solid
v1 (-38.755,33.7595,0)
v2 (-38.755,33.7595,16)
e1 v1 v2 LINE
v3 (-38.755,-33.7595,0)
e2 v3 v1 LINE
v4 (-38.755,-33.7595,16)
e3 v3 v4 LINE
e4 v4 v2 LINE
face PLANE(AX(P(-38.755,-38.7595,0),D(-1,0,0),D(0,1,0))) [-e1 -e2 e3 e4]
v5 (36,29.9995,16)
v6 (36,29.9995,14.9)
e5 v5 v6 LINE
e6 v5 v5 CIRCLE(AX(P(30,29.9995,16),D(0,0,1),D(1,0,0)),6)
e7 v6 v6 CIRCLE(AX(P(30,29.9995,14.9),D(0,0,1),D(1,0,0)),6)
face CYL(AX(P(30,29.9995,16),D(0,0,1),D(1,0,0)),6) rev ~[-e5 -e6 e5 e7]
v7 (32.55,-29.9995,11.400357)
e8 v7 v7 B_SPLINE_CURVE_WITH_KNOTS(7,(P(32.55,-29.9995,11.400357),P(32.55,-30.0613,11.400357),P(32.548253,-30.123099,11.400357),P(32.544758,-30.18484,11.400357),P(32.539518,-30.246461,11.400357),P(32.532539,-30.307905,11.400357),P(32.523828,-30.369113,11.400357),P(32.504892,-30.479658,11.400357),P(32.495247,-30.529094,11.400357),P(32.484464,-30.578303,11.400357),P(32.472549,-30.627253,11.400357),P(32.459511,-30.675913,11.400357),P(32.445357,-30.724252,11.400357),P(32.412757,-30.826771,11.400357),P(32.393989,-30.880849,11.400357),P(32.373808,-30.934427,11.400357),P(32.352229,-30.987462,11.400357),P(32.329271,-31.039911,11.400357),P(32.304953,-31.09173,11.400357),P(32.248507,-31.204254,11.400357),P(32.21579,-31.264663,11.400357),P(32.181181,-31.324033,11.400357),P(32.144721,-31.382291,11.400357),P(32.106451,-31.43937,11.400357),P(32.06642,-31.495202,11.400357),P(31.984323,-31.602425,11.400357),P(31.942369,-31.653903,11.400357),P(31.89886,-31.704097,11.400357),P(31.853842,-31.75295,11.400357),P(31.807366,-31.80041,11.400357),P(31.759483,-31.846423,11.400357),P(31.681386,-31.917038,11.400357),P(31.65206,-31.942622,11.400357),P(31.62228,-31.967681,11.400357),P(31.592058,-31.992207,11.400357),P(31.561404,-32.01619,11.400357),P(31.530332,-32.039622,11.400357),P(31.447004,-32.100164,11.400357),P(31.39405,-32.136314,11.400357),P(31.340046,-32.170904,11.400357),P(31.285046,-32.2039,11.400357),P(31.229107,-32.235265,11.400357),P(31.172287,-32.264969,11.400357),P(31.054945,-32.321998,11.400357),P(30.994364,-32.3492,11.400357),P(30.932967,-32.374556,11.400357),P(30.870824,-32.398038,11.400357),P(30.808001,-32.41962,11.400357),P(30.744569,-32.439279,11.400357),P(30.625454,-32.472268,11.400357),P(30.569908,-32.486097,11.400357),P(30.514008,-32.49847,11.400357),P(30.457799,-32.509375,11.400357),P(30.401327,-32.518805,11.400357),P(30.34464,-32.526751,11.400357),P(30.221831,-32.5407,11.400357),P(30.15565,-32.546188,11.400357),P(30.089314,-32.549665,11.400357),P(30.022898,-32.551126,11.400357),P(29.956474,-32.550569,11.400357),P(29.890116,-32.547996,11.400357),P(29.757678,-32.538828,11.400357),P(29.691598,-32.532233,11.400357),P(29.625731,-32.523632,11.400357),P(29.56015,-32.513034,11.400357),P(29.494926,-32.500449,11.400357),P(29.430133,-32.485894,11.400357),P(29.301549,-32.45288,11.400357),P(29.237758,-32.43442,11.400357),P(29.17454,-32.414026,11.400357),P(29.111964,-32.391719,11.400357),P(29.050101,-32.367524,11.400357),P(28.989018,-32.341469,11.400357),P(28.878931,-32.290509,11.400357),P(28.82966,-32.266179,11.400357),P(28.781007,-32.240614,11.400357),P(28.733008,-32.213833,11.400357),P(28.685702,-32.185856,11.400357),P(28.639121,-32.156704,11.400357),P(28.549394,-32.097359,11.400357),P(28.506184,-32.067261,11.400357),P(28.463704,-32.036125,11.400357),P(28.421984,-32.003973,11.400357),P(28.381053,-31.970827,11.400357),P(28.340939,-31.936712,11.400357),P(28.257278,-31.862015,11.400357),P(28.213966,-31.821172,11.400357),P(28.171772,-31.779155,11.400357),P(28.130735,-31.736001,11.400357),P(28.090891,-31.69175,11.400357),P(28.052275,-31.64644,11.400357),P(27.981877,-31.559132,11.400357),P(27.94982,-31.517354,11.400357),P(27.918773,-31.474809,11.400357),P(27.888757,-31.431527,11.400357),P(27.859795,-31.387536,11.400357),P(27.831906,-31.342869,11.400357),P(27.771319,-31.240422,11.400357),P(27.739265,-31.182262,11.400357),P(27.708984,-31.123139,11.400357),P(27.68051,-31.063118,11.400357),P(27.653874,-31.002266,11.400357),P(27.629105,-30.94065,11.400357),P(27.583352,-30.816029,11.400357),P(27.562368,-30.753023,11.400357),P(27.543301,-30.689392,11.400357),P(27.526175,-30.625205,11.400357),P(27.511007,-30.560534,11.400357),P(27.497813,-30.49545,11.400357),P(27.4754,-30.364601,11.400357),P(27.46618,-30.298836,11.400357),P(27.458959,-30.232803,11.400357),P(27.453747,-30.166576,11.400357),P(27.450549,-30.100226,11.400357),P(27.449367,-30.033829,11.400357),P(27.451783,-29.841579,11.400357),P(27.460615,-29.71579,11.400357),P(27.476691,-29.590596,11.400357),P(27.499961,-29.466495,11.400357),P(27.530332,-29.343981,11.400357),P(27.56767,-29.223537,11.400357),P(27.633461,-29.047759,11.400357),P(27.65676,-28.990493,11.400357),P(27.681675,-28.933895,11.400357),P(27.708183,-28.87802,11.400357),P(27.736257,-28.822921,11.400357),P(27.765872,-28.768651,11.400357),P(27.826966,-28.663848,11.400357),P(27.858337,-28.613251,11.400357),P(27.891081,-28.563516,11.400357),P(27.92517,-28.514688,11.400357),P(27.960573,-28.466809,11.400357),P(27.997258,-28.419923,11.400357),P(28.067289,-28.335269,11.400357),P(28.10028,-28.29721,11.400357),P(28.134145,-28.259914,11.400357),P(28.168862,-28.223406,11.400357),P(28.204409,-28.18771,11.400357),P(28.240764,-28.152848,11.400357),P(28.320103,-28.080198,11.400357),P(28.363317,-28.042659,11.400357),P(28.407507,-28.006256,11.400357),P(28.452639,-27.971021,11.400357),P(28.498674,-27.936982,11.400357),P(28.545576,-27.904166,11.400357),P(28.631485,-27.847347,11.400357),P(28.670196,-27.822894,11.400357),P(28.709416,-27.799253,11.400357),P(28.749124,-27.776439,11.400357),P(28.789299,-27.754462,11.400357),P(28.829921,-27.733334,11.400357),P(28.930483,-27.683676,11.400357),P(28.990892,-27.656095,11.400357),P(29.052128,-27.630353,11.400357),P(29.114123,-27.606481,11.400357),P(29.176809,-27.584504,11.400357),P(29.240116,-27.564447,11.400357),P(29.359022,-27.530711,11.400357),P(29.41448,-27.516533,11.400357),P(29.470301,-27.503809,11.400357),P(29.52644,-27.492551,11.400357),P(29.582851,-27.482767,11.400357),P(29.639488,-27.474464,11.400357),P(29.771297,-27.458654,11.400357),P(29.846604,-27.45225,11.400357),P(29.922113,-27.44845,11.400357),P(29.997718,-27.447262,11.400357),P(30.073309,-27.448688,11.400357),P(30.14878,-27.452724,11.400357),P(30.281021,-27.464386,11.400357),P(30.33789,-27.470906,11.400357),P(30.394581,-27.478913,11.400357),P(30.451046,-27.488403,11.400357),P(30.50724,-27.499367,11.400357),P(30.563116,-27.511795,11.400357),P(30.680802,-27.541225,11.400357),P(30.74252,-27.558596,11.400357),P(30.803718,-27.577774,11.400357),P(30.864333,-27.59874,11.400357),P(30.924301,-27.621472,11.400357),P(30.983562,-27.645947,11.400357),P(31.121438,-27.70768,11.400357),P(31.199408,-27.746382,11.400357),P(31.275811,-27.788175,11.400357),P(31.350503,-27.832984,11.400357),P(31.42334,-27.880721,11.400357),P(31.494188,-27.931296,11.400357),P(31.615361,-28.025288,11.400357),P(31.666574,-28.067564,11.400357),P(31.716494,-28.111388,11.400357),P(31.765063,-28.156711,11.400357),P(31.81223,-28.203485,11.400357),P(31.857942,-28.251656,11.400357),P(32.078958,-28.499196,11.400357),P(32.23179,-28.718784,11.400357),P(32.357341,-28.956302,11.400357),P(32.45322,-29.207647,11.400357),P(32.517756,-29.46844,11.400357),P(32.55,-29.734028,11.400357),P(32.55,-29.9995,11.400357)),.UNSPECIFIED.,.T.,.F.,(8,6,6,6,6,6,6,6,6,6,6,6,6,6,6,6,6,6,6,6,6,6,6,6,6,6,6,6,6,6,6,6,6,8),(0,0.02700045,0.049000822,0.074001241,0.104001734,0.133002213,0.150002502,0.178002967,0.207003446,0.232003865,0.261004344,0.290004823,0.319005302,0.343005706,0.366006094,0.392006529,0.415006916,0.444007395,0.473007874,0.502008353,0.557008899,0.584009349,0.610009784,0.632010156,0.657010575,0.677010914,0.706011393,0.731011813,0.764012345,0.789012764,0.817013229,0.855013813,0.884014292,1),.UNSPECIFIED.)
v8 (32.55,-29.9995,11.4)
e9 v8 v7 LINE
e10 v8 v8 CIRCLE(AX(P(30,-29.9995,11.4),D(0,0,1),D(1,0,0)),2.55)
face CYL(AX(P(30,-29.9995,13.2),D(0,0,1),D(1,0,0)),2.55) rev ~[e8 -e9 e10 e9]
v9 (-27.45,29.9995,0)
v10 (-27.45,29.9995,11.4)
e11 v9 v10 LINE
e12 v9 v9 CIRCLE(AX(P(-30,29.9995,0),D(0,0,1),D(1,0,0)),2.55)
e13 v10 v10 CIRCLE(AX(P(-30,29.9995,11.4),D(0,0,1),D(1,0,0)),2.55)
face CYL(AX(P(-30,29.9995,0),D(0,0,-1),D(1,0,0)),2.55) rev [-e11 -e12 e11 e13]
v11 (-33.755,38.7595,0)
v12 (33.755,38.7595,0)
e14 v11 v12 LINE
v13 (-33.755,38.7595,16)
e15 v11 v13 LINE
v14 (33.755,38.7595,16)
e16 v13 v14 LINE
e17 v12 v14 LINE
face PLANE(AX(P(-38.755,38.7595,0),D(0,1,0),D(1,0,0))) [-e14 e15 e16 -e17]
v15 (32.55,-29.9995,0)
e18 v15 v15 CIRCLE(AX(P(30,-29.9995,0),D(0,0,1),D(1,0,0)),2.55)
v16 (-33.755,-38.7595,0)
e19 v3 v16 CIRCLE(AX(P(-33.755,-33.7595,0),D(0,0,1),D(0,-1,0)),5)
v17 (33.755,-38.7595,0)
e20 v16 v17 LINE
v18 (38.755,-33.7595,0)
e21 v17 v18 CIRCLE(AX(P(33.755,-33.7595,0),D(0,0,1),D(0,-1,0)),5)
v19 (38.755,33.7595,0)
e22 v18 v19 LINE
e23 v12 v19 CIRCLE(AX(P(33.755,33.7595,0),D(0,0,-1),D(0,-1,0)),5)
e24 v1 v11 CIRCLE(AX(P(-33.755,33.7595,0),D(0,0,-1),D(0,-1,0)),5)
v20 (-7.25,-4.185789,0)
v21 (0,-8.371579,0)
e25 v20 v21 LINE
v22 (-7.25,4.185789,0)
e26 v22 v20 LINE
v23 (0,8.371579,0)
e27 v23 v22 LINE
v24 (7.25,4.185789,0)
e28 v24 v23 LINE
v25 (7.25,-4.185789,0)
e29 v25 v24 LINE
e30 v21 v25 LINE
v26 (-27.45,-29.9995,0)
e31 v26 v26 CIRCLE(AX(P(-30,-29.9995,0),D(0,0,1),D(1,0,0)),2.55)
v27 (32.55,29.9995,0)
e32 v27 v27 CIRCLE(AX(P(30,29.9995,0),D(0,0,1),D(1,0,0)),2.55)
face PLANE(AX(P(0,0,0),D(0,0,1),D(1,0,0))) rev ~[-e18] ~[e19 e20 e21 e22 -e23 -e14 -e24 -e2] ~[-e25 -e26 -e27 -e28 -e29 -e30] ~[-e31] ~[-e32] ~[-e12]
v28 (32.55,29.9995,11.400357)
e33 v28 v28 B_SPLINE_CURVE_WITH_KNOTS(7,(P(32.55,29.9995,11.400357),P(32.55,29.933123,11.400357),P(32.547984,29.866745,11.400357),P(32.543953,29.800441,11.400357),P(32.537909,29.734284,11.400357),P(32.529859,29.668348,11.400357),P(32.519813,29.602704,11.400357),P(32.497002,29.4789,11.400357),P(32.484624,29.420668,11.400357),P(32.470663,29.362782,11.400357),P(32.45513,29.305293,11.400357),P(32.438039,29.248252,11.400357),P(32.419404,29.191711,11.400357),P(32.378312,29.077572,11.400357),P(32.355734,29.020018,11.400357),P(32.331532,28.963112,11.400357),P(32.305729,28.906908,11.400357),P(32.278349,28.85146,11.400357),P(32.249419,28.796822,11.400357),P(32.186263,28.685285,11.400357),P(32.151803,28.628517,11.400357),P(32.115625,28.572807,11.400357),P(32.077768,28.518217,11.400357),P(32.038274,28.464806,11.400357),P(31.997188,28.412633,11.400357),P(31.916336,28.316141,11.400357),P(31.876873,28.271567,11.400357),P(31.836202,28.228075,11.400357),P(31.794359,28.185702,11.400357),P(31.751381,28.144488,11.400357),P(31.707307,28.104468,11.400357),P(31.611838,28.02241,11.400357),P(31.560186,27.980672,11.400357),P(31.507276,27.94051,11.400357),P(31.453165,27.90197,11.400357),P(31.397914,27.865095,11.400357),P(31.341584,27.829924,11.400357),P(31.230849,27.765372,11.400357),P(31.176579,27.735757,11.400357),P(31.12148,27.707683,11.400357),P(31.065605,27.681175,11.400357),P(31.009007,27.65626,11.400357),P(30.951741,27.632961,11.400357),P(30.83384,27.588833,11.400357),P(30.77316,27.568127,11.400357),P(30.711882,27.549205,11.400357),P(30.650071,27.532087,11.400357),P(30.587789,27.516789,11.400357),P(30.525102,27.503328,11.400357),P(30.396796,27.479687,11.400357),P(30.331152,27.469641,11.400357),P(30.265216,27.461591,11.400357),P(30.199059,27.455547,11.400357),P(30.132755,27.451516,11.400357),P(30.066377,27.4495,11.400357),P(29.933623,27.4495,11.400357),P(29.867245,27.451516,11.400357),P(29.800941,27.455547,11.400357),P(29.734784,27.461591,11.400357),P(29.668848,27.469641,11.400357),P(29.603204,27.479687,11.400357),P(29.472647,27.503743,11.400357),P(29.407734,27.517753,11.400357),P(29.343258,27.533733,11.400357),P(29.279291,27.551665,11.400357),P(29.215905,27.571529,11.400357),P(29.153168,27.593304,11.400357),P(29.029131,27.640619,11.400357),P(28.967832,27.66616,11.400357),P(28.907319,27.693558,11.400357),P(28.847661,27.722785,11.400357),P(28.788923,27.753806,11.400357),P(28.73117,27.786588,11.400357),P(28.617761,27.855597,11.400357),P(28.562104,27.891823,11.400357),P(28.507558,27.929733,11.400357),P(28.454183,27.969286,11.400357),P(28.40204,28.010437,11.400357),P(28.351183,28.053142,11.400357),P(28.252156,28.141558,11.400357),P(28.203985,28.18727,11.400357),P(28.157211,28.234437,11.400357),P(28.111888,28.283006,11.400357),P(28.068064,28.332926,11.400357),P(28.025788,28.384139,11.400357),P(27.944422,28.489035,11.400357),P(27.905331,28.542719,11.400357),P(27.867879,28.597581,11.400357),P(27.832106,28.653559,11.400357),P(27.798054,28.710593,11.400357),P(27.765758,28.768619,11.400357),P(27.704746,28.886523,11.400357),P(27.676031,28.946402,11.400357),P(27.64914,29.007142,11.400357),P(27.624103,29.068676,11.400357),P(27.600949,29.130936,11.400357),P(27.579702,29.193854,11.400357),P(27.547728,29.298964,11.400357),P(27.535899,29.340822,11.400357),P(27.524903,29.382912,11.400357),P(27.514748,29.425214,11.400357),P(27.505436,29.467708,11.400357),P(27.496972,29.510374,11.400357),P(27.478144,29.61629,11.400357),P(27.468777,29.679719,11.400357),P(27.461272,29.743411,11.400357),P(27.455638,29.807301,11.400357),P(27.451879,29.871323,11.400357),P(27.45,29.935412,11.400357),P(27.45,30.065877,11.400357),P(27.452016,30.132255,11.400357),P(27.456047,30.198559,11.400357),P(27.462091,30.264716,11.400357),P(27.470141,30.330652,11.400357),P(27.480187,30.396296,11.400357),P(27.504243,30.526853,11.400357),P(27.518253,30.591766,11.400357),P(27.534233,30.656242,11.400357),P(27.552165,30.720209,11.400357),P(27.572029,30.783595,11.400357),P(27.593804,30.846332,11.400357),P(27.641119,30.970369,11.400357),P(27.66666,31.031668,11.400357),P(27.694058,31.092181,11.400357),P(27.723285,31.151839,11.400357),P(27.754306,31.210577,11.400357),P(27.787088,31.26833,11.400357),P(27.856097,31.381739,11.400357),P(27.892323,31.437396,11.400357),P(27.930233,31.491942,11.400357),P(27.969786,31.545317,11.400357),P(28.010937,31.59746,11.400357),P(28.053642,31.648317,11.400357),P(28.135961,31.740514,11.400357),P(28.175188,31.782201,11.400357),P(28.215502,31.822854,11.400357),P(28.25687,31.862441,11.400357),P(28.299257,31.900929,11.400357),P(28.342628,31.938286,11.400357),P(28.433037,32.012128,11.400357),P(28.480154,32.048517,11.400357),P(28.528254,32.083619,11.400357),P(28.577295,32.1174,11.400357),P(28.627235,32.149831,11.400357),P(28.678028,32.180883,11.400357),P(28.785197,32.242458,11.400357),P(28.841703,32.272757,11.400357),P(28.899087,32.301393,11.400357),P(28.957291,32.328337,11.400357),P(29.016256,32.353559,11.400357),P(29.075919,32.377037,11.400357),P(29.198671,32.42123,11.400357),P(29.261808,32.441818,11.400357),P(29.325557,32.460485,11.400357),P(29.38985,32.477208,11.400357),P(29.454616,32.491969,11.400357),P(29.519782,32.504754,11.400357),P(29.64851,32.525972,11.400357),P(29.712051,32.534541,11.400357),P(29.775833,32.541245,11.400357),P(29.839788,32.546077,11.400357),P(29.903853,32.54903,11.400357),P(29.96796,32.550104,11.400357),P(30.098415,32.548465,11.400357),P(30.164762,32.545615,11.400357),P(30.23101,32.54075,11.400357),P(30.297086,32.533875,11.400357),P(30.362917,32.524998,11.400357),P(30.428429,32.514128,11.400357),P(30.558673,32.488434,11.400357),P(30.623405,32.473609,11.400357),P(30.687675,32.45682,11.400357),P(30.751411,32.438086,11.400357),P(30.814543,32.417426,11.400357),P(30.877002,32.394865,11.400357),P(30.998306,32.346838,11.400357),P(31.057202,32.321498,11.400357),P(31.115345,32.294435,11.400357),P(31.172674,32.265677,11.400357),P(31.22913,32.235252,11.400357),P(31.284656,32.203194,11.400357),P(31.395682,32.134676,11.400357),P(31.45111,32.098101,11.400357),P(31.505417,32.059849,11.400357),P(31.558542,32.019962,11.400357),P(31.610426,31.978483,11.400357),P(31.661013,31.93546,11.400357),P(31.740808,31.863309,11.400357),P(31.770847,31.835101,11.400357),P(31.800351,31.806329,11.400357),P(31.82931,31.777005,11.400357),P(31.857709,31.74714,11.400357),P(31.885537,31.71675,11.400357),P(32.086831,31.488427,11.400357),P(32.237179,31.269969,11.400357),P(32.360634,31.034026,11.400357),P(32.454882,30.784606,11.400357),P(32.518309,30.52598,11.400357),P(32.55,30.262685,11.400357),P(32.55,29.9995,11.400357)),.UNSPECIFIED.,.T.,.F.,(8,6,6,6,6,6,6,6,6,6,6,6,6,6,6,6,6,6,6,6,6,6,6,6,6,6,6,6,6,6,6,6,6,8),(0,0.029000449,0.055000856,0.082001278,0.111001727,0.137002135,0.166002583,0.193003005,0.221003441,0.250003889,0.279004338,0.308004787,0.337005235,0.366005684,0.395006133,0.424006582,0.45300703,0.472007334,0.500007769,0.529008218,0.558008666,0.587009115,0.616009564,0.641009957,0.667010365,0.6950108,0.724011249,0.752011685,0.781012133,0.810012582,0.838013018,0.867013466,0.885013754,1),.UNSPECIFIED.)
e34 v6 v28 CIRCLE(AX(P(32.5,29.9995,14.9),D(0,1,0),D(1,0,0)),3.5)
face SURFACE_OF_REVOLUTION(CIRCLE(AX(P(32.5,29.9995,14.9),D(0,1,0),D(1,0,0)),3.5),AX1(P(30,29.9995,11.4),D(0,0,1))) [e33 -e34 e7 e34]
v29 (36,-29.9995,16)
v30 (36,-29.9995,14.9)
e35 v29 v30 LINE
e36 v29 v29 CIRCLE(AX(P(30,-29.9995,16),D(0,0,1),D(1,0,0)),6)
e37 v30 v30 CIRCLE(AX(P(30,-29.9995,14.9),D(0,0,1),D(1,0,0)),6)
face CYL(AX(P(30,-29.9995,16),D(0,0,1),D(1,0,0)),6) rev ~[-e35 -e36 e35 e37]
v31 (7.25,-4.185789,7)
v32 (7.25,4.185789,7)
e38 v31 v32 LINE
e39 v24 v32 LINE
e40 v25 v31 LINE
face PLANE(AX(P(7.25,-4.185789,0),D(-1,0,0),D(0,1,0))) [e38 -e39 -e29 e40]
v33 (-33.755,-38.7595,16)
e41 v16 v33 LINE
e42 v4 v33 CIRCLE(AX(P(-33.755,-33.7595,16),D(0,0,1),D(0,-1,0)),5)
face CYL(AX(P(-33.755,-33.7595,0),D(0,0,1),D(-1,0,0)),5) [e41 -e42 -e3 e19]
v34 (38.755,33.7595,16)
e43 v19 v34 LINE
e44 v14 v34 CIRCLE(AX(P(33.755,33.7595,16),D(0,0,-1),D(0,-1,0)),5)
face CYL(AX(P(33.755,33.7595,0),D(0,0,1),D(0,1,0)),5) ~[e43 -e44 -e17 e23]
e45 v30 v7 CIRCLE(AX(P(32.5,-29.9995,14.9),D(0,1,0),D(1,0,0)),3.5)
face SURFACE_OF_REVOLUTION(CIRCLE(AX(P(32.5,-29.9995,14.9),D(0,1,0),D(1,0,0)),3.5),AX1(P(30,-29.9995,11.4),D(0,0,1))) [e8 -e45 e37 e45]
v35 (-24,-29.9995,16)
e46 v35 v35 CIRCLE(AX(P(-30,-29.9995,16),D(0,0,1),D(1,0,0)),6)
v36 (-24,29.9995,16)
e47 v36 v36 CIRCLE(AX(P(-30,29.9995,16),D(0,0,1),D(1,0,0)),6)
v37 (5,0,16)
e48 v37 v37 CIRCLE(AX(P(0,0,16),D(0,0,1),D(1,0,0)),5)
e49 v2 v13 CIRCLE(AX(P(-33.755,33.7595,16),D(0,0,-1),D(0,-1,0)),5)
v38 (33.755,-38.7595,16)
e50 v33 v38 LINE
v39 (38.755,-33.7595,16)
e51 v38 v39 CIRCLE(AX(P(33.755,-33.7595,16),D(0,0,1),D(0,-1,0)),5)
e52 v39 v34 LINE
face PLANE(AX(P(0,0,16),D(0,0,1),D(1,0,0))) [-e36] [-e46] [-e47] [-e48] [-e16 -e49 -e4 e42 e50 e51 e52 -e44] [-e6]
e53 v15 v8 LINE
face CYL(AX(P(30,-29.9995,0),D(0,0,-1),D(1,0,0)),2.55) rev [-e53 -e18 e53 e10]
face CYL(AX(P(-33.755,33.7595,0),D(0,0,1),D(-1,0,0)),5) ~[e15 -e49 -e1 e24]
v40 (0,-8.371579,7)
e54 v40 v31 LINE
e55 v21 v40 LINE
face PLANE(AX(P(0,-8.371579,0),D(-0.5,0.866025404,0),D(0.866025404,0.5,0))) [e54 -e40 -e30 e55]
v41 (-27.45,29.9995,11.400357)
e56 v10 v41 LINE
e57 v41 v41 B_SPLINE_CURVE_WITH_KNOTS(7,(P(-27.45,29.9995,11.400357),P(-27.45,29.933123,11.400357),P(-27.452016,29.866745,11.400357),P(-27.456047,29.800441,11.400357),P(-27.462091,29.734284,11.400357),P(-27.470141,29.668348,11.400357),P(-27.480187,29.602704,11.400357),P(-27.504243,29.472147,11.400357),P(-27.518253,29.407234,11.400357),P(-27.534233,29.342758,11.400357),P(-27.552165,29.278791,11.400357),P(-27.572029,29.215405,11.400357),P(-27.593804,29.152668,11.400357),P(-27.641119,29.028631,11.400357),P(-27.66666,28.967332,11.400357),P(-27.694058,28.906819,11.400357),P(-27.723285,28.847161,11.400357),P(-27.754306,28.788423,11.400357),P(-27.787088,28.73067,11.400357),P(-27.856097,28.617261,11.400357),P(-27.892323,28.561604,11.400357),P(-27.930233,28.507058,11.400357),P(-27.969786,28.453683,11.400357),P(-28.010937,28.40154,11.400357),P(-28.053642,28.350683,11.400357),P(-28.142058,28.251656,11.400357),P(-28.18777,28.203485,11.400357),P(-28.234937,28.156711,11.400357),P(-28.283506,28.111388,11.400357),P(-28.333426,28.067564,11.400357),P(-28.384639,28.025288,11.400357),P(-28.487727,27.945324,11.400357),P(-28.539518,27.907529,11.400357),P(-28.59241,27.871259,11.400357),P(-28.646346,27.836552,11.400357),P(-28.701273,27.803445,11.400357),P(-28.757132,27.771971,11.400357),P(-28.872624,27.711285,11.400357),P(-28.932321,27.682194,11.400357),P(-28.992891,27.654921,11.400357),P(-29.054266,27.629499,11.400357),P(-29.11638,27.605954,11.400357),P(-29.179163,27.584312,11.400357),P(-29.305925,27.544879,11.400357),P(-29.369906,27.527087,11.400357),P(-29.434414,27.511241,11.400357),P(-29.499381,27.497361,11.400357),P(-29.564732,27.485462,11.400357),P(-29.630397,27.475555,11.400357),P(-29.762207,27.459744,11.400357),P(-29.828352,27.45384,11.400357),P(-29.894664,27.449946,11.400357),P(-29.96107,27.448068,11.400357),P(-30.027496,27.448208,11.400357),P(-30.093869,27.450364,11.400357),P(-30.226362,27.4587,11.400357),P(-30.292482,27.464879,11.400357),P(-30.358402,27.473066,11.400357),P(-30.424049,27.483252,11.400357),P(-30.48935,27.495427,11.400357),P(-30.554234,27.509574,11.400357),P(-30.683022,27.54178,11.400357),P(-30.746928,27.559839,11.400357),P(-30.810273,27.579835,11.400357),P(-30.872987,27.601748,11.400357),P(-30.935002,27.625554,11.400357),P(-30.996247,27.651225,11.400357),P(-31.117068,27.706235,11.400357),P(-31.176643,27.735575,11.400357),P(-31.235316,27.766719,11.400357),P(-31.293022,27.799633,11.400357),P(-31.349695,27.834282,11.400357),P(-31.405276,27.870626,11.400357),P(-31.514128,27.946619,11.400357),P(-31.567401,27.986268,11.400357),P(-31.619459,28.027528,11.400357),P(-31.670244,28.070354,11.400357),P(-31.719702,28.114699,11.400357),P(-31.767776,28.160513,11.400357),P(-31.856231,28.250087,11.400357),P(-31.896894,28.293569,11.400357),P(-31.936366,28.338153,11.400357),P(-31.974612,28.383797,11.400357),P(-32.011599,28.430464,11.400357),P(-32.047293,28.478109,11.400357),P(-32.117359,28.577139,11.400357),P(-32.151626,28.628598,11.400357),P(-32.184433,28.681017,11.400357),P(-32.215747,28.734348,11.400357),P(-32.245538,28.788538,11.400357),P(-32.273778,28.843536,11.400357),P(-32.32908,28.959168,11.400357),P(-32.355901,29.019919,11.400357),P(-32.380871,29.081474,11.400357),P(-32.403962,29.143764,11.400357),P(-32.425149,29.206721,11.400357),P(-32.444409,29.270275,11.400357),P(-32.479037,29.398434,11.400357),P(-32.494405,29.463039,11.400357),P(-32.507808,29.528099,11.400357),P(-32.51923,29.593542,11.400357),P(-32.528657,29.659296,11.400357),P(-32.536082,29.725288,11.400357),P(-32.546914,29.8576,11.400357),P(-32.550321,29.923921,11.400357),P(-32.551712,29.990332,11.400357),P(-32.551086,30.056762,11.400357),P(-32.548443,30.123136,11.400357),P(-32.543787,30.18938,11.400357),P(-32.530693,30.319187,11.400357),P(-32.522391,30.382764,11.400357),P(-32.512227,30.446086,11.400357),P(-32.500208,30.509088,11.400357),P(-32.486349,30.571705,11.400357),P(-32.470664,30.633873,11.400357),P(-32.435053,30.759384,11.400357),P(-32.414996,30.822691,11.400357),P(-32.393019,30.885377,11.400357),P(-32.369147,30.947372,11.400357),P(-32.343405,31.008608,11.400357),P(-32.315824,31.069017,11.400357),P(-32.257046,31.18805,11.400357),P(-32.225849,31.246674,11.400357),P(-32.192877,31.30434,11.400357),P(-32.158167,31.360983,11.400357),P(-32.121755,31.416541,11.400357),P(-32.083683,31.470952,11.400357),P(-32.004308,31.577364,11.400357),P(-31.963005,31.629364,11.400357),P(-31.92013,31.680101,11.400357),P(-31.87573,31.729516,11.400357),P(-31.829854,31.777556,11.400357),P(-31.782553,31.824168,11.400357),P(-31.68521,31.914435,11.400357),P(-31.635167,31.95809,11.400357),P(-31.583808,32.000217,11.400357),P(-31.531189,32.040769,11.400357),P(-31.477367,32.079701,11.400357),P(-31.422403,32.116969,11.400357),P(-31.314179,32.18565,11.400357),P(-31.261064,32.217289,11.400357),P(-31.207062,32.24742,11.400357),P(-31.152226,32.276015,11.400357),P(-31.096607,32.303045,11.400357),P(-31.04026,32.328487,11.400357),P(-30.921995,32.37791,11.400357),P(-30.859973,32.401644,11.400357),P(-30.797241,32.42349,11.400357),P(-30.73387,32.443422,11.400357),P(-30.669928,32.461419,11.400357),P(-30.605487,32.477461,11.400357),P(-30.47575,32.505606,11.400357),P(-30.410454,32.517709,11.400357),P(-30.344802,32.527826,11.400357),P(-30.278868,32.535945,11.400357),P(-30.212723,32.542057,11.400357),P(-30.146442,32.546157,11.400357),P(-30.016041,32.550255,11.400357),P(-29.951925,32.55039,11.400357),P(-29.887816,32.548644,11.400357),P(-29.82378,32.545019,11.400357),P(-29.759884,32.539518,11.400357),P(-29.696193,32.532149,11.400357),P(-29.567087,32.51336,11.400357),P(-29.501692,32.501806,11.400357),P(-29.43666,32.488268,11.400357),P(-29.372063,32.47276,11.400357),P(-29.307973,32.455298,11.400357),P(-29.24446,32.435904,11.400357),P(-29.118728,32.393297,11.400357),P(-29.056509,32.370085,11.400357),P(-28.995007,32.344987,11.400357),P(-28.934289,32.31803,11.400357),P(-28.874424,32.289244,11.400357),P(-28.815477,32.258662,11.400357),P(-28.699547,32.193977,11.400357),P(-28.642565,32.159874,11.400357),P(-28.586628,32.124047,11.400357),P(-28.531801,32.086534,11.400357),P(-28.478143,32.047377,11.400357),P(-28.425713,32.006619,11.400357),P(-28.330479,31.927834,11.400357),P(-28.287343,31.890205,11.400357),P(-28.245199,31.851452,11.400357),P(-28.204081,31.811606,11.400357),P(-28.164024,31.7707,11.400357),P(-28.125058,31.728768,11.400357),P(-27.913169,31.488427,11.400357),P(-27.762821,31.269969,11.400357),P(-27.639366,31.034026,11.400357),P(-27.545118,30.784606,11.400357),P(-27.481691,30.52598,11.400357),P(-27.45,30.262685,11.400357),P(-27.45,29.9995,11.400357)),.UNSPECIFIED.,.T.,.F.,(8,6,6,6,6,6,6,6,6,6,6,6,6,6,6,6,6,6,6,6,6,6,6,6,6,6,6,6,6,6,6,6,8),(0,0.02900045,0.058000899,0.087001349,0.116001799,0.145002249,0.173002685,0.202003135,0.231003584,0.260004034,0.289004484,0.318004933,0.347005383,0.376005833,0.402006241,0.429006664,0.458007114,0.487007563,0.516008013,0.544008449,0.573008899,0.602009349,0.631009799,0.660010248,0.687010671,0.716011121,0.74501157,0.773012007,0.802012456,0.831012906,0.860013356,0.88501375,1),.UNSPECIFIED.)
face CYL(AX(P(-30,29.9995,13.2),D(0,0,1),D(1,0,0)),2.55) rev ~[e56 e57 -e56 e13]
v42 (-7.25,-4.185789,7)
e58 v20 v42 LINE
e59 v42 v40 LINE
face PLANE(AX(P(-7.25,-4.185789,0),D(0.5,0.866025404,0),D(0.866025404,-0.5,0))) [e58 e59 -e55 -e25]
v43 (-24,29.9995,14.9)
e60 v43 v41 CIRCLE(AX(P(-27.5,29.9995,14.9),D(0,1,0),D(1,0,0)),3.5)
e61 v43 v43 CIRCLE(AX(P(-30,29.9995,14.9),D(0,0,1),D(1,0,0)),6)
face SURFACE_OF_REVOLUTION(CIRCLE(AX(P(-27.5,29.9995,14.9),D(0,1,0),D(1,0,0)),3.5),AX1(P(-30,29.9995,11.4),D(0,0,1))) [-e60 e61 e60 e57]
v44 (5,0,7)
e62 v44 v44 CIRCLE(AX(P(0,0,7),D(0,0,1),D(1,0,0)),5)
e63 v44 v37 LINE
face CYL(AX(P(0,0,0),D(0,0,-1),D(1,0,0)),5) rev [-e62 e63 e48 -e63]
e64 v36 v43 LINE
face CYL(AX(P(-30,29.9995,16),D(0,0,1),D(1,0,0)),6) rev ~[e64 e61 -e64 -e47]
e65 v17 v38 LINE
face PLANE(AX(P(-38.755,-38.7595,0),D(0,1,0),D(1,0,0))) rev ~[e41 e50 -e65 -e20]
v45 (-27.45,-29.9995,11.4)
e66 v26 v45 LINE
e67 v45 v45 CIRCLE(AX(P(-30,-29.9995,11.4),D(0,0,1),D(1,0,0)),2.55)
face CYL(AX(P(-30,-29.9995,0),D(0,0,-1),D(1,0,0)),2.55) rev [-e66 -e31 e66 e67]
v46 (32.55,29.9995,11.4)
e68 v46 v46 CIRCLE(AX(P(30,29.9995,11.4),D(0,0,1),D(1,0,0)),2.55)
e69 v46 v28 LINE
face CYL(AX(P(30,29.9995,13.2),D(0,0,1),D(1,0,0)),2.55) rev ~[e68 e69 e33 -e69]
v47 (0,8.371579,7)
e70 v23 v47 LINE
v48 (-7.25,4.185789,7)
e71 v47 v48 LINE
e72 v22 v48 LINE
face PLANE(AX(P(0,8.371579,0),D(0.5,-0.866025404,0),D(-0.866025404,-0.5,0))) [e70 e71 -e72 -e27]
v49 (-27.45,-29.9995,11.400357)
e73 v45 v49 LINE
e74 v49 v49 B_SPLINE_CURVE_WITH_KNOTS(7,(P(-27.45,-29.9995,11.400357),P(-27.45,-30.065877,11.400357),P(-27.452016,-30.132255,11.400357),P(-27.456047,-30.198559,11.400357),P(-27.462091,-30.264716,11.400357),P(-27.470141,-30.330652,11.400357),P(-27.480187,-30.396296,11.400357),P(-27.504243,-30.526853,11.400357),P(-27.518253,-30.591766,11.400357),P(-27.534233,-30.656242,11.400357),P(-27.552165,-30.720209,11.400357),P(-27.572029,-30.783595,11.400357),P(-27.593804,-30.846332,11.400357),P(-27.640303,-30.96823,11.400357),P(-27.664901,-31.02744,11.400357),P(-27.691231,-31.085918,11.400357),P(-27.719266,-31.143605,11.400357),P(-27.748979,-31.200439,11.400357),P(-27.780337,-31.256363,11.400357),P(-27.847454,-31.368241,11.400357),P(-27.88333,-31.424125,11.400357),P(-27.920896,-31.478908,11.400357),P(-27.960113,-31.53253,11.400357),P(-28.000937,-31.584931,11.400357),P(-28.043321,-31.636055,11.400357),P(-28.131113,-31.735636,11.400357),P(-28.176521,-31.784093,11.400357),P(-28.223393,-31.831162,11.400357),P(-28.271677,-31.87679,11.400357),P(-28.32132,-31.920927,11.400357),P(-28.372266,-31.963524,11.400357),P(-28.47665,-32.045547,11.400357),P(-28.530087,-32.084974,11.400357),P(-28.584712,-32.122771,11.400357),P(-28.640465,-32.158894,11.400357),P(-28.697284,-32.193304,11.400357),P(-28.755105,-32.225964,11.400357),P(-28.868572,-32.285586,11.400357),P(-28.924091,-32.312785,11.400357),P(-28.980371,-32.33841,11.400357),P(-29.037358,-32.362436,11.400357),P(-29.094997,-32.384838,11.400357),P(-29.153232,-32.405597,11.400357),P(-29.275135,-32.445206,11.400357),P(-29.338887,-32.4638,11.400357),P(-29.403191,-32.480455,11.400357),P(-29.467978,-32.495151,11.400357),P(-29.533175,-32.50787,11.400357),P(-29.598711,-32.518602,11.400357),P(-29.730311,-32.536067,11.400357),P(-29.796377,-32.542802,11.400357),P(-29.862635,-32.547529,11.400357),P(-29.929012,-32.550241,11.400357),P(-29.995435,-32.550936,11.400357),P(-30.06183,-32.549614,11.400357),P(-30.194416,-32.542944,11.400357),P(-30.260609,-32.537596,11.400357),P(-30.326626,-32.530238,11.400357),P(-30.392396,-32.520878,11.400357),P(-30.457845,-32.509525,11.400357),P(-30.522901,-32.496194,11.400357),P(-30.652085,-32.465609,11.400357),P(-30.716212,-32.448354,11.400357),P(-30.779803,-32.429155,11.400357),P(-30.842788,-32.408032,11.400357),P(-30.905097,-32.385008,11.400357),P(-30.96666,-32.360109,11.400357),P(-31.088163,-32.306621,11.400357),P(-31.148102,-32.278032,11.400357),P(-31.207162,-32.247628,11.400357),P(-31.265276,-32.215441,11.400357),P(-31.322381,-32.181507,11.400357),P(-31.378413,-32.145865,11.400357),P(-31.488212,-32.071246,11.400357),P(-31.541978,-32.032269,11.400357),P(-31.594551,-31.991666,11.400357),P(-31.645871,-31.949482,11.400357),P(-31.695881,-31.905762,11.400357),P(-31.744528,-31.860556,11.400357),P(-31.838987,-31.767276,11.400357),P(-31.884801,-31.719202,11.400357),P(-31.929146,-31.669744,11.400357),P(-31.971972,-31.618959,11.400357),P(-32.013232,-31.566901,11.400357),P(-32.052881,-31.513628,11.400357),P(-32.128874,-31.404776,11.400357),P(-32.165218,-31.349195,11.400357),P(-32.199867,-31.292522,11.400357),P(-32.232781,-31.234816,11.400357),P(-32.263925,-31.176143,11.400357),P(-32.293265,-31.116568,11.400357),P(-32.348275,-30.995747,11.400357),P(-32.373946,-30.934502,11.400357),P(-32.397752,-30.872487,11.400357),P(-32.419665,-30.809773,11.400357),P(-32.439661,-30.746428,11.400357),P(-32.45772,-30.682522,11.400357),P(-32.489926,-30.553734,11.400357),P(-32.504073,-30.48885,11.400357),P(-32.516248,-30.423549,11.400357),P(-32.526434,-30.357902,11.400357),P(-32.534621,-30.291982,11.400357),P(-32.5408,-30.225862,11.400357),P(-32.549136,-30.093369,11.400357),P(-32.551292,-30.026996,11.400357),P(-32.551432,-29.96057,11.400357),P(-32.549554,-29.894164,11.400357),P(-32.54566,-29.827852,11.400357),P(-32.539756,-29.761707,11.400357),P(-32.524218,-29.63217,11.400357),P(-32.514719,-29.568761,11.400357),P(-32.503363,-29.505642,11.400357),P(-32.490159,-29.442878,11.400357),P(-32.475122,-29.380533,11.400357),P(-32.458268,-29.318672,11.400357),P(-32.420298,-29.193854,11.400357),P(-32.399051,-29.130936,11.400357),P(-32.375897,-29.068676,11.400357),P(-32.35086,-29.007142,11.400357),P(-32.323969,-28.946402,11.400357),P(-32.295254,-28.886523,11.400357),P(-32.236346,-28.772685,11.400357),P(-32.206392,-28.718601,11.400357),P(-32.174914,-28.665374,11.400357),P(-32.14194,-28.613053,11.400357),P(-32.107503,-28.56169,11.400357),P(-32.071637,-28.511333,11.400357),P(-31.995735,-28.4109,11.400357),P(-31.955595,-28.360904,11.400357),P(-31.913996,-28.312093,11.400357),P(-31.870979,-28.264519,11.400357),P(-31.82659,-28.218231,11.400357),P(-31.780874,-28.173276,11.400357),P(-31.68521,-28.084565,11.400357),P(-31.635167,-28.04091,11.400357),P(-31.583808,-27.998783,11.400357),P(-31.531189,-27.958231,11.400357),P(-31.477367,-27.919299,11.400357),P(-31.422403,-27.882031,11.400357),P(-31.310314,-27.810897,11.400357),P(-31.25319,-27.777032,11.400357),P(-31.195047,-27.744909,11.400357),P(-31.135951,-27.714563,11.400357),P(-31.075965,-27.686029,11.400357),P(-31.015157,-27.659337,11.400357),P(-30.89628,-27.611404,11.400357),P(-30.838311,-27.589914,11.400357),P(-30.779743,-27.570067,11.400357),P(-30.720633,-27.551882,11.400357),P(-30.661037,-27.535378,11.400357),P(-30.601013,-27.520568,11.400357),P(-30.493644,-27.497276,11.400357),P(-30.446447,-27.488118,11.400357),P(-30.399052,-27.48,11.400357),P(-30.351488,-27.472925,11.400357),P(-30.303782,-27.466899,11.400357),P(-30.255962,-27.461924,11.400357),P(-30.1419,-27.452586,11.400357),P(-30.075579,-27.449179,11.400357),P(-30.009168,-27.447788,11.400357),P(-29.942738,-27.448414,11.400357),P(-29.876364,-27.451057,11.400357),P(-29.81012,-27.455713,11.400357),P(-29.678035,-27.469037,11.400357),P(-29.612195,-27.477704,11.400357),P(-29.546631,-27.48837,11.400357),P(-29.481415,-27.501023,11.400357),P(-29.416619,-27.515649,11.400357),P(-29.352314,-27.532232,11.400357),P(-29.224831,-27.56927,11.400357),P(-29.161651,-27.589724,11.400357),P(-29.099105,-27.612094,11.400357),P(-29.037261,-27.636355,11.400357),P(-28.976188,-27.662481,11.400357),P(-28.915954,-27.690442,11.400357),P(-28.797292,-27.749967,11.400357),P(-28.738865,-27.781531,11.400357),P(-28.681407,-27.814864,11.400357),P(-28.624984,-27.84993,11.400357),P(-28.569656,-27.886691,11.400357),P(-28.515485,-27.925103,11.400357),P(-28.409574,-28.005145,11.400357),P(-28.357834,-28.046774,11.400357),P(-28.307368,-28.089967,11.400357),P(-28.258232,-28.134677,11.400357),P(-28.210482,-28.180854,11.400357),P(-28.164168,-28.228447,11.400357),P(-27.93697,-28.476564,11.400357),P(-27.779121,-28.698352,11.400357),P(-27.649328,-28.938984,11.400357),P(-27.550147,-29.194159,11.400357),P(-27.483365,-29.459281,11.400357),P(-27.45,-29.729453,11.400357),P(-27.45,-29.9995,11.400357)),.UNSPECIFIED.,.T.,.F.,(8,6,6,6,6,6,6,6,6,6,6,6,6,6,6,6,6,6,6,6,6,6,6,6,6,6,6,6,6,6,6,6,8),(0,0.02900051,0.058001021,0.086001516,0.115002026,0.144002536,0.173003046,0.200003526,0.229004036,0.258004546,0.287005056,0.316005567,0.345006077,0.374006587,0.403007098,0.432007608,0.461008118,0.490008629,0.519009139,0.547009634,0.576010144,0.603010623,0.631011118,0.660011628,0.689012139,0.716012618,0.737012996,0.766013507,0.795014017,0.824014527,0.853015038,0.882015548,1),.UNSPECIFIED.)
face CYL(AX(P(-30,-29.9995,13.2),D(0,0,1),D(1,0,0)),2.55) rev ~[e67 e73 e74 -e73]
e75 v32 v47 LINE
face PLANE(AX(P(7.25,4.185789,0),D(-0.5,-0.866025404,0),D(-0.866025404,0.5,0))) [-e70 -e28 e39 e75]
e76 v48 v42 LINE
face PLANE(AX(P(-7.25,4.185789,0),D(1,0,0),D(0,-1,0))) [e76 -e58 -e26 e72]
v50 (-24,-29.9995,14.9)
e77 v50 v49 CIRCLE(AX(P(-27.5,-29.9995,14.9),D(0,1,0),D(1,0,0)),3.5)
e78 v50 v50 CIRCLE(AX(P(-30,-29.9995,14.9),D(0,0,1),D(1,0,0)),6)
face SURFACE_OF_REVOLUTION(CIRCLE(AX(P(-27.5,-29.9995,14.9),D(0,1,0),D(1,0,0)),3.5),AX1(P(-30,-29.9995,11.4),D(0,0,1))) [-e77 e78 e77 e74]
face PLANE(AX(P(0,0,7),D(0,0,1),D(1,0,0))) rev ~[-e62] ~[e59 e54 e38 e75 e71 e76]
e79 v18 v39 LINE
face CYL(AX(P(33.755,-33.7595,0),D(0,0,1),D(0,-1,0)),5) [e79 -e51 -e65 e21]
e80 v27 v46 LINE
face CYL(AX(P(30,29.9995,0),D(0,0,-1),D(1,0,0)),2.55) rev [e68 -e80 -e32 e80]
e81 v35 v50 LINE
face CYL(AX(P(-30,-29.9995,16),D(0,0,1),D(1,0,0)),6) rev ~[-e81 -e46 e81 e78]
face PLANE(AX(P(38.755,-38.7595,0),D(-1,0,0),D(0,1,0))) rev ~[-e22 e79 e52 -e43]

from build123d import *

# Parameters (mm, degrees)
F0_W         = 77.51
F0_H         = 77.519
F0_R         = 2.55
F0_R_2       = 5
F1_DEPTH     = 16
F2_DEPTH     = 7
F3_R         = 5
F4_R         = 6
F4_R_2       = 2.55
F5_DEPTH     = 4.6
F6_S5_R      = 2.55
F6_T6_DEPTH  = 10
F6_S11_R     = 2.55
F6_T12_DEPTH = 10
F6_S17_R     = 2.55
F6_T18_DEPTH = 10
F6_S23_R     = 2.55
F6_T24_DEPTH = 10


# Not quite as in the source:
# - a fillet or chamfer that OpenCascade refuses, or shapes differently, is made with other operations: its cross-section is extruded or revolved along the edge and cut away or added
# - a feature names something its author has since deleted; it is built from what else it names


with BuildPart() as f1:
    # F0 (on Top) → F1 (new body)
    with BuildSketch(Plane.XY):
        Rectangle(F0_W, F0_H)
        with Locations((-30, -29.9995)):
            Circle(F0_R, mode=Mode.SUBTRACT)
        with Locations((30, -29.9995)):
            Circle(F0_R, mode=Mode.SUBTRACT)
        with Locations((-30, 29.9995)):
            Circle(F0_R, mode=Mode.SUBTRACT)
        Polygon((7.25, -4.1857894516), (0, -8.3715789032), (-7.25, -4.1857894516), (-7.25, 4.1857894516), (0, 8.3715789032), (7.25, 4.1857894516), align=None, mode=Mode.SUBTRACT)
        with Locations((30, 29.9995)):
            Circle(F0_R, mode=Mode.SUBTRACT)
        Polygon((-7.25, -4.1857894516), (0, -8.3715789032), (7.25, -4.1857894516), (7.25, 4.1857894516), (0, 8.3715789032), (-7.25, 4.1857894516), align=None)
        Circle(F0_R_2, mode=Mode.SUBTRACT)
    extrude(amount=F1_DEPTH)

    # F0 (on Top) → F2 (cut)
    with BuildSketch(Plane.XY):
        Polygon((-7.25, -4.1857894516), (0, -8.3715789032), (7.25, -4.1857894516), (7.25, 4.1857894516), (0, 8.3715789032), (-7.25, 4.1857894516), align=None)
        Circle(F0_R_2, mode=Mode.SUBTRACT)
    extrude(amount=F2_DEPTH, mode=Mode.SUBTRACT)

    # F3
    f3_edges = [f1.edges().sort_by_distance(p)[0] for p in [
        (38.755, -38.7595, 8),
        (-38.755, -38.7595, 8),
        (38.755, 38.7595, 8),
        (-38.755, 38.7595, 8),
    ]]
    fillet(f3_edges, radius=F3_R)

    # F4 (on face) → F5 (cut)
    with BuildSketch(Plane.XY.offset(16)):
        with Locations((-30, 29.9995)):
            Circle(F4_R)
        with Locations((-30, 29.9995)):
            Circle(F4_R_2, mode=Mode.SUBTRACT)
        with Locations((30, 29.9995)):
            Circle(F4_R)
        with Locations((30, 29.9995)):
            Circle(F4_R_2, mode=Mode.SUBTRACT)
        with Locations((30, -29.9995)):
            Circle(F4_R)
        with Locations((30, -29.9995)):
            Circle(F4_R_2, mode=Mode.SUBTRACT)
        with Locations((-30, -29.9995)):
            Circle(F4_R)
        with Locations((-30, -29.9995)):
            Circle(F4_R_2, mode=Mode.SUBTRACT)
    extrude(amount=-F5_DEPTH, mode=Mode.SUBTRACT)

    # F6: fillet of radius 3.5 on 4 edges, made by hand


with BuildPart() as f6_tool2:
    # F6_s3 → F6_t4 (revolve)
    with BuildSketch(Plane.XZ.offset(29.9995)):
        with BuildLine():
            ThreePointArc((-24, 14.9), (-25.0251262658, 12.4251262658), (-27.5, 11.4))
            Line((-27.5, 11.4), (-24, 11.4))
            Line((-24, 11.4), (-24, 14.9))
        make_face()
    revolve(axis=Axis((-30, -29.9995, 11.4), (0, 0, 1)))

    # F6_s5 → F6_t6 (cut, symmetric)
    with BuildSketch(Plane.XY.offset(13.2)):
        with Locations((-30, -29.9995)):
            Circle(F6_S5_R)
    extrude(amount=F6_T6_DEPTH, both=True, mode=Mode.SUBTRACT)


with BuildPart() as f1_1:
    add(f1.part)

    # F6_t1: union F6_tool2
    add(f6_tool2.part)


with BuildPart() as f6_tool8:
    # F6_s9 → F6_t10 (revolve)
    with BuildSketch(Plane.XZ.offset(-29.9995)):
        with BuildLine():
            ThreePointArc((-24, 14.9), (-25.0251262658, 12.4251262658), (-27.5, 11.4))
            Line((-27.5, 11.4), (-24, 11.4))
            Line((-24, 11.4), (-24, 14.9))
        make_face()
    revolve(axis=Axis((-30, 29.9995, 11.4), (0, 0, 1)))

    # F6_s11 → F6_t12 (cut, symmetric)
    with BuildSketch(Plane.XY.offset(13.2)):
        with Locations((-30, 29.9995)):
            Circle(F6_S11_R)
    extrude(amount=F6_T12_DEPTH, both=True, mode=Mode.SUBTRACT)


with BuildPart() as f1_2:
    add(f1_1.part)

    # F6_t7: union F6_tool8
    add(f6_tool8.part)


with BuildPart() as f6_tool14:
    # F6_s15 → F6_t16 (revolve)
    with BuildSketch(Plane.XZ.offset(29.9995)):
        with BuildLine():
            ThreePointArc((36, 14.9), (34.9748737342, 12.4251262658), (32.5, 11.4))
            Line((32.5, 11.4), (36, 11.4))
            Line((36, 11.4), (36, 14.9))
        make_face()
    revolve(axis=Axis((30, -29.9995, 11.4), (0, 0, 1)))

    # F6_s17 → F6_t18 (cut, symmetric)
    with BuildSketch(Plane.XY.offset(13.2)):
        with Locations((30, -29.9995)):
            Circle(F6_S17_R)
    extrude(amount=F6_T18_DEPTH, both=True, mode=Mode.SUBTRACT)


with BuildPart() as f1_3:
    add(f1_2.part)

    # F6_t13: union F6_tool14
    add(f6_tool14.part)


with BuildPart() as f6_tool20:
    # F6_s21 → F6_t22 (revolve)
    with BuildSketch(Plane.XZ.offset(-29.9995)):
        with BuildLine():
            ThreePointArc((36, 14.9), (34.9748737342, 12.4251262658), (32.5, 11.4))
            Line((32.5, 11.4), (36, 11.4))
            Line((36, 11.4), (36, 14.9))
        make_face()
    revolve(axis=Axis((30, 29.9995, 11.4), (0, 0, 1)))

    # F6_s23 → F6_t24 (cut, symmetric)
    with BuildSketch(Plane.XY.offset(13.2)):
        with Locations((30, 29.9995)):
            Circle(F6_S23_R)
    extrude(amount=F6_T24_DEPTH, both=True, mode=Mode.SUBTRACT)


with BuildPart() as f1_4:
    add(f1_3.part)

    # F6_t19: union F6_tool20
    add(f6_tool20.part)


solid = f1_4.part
